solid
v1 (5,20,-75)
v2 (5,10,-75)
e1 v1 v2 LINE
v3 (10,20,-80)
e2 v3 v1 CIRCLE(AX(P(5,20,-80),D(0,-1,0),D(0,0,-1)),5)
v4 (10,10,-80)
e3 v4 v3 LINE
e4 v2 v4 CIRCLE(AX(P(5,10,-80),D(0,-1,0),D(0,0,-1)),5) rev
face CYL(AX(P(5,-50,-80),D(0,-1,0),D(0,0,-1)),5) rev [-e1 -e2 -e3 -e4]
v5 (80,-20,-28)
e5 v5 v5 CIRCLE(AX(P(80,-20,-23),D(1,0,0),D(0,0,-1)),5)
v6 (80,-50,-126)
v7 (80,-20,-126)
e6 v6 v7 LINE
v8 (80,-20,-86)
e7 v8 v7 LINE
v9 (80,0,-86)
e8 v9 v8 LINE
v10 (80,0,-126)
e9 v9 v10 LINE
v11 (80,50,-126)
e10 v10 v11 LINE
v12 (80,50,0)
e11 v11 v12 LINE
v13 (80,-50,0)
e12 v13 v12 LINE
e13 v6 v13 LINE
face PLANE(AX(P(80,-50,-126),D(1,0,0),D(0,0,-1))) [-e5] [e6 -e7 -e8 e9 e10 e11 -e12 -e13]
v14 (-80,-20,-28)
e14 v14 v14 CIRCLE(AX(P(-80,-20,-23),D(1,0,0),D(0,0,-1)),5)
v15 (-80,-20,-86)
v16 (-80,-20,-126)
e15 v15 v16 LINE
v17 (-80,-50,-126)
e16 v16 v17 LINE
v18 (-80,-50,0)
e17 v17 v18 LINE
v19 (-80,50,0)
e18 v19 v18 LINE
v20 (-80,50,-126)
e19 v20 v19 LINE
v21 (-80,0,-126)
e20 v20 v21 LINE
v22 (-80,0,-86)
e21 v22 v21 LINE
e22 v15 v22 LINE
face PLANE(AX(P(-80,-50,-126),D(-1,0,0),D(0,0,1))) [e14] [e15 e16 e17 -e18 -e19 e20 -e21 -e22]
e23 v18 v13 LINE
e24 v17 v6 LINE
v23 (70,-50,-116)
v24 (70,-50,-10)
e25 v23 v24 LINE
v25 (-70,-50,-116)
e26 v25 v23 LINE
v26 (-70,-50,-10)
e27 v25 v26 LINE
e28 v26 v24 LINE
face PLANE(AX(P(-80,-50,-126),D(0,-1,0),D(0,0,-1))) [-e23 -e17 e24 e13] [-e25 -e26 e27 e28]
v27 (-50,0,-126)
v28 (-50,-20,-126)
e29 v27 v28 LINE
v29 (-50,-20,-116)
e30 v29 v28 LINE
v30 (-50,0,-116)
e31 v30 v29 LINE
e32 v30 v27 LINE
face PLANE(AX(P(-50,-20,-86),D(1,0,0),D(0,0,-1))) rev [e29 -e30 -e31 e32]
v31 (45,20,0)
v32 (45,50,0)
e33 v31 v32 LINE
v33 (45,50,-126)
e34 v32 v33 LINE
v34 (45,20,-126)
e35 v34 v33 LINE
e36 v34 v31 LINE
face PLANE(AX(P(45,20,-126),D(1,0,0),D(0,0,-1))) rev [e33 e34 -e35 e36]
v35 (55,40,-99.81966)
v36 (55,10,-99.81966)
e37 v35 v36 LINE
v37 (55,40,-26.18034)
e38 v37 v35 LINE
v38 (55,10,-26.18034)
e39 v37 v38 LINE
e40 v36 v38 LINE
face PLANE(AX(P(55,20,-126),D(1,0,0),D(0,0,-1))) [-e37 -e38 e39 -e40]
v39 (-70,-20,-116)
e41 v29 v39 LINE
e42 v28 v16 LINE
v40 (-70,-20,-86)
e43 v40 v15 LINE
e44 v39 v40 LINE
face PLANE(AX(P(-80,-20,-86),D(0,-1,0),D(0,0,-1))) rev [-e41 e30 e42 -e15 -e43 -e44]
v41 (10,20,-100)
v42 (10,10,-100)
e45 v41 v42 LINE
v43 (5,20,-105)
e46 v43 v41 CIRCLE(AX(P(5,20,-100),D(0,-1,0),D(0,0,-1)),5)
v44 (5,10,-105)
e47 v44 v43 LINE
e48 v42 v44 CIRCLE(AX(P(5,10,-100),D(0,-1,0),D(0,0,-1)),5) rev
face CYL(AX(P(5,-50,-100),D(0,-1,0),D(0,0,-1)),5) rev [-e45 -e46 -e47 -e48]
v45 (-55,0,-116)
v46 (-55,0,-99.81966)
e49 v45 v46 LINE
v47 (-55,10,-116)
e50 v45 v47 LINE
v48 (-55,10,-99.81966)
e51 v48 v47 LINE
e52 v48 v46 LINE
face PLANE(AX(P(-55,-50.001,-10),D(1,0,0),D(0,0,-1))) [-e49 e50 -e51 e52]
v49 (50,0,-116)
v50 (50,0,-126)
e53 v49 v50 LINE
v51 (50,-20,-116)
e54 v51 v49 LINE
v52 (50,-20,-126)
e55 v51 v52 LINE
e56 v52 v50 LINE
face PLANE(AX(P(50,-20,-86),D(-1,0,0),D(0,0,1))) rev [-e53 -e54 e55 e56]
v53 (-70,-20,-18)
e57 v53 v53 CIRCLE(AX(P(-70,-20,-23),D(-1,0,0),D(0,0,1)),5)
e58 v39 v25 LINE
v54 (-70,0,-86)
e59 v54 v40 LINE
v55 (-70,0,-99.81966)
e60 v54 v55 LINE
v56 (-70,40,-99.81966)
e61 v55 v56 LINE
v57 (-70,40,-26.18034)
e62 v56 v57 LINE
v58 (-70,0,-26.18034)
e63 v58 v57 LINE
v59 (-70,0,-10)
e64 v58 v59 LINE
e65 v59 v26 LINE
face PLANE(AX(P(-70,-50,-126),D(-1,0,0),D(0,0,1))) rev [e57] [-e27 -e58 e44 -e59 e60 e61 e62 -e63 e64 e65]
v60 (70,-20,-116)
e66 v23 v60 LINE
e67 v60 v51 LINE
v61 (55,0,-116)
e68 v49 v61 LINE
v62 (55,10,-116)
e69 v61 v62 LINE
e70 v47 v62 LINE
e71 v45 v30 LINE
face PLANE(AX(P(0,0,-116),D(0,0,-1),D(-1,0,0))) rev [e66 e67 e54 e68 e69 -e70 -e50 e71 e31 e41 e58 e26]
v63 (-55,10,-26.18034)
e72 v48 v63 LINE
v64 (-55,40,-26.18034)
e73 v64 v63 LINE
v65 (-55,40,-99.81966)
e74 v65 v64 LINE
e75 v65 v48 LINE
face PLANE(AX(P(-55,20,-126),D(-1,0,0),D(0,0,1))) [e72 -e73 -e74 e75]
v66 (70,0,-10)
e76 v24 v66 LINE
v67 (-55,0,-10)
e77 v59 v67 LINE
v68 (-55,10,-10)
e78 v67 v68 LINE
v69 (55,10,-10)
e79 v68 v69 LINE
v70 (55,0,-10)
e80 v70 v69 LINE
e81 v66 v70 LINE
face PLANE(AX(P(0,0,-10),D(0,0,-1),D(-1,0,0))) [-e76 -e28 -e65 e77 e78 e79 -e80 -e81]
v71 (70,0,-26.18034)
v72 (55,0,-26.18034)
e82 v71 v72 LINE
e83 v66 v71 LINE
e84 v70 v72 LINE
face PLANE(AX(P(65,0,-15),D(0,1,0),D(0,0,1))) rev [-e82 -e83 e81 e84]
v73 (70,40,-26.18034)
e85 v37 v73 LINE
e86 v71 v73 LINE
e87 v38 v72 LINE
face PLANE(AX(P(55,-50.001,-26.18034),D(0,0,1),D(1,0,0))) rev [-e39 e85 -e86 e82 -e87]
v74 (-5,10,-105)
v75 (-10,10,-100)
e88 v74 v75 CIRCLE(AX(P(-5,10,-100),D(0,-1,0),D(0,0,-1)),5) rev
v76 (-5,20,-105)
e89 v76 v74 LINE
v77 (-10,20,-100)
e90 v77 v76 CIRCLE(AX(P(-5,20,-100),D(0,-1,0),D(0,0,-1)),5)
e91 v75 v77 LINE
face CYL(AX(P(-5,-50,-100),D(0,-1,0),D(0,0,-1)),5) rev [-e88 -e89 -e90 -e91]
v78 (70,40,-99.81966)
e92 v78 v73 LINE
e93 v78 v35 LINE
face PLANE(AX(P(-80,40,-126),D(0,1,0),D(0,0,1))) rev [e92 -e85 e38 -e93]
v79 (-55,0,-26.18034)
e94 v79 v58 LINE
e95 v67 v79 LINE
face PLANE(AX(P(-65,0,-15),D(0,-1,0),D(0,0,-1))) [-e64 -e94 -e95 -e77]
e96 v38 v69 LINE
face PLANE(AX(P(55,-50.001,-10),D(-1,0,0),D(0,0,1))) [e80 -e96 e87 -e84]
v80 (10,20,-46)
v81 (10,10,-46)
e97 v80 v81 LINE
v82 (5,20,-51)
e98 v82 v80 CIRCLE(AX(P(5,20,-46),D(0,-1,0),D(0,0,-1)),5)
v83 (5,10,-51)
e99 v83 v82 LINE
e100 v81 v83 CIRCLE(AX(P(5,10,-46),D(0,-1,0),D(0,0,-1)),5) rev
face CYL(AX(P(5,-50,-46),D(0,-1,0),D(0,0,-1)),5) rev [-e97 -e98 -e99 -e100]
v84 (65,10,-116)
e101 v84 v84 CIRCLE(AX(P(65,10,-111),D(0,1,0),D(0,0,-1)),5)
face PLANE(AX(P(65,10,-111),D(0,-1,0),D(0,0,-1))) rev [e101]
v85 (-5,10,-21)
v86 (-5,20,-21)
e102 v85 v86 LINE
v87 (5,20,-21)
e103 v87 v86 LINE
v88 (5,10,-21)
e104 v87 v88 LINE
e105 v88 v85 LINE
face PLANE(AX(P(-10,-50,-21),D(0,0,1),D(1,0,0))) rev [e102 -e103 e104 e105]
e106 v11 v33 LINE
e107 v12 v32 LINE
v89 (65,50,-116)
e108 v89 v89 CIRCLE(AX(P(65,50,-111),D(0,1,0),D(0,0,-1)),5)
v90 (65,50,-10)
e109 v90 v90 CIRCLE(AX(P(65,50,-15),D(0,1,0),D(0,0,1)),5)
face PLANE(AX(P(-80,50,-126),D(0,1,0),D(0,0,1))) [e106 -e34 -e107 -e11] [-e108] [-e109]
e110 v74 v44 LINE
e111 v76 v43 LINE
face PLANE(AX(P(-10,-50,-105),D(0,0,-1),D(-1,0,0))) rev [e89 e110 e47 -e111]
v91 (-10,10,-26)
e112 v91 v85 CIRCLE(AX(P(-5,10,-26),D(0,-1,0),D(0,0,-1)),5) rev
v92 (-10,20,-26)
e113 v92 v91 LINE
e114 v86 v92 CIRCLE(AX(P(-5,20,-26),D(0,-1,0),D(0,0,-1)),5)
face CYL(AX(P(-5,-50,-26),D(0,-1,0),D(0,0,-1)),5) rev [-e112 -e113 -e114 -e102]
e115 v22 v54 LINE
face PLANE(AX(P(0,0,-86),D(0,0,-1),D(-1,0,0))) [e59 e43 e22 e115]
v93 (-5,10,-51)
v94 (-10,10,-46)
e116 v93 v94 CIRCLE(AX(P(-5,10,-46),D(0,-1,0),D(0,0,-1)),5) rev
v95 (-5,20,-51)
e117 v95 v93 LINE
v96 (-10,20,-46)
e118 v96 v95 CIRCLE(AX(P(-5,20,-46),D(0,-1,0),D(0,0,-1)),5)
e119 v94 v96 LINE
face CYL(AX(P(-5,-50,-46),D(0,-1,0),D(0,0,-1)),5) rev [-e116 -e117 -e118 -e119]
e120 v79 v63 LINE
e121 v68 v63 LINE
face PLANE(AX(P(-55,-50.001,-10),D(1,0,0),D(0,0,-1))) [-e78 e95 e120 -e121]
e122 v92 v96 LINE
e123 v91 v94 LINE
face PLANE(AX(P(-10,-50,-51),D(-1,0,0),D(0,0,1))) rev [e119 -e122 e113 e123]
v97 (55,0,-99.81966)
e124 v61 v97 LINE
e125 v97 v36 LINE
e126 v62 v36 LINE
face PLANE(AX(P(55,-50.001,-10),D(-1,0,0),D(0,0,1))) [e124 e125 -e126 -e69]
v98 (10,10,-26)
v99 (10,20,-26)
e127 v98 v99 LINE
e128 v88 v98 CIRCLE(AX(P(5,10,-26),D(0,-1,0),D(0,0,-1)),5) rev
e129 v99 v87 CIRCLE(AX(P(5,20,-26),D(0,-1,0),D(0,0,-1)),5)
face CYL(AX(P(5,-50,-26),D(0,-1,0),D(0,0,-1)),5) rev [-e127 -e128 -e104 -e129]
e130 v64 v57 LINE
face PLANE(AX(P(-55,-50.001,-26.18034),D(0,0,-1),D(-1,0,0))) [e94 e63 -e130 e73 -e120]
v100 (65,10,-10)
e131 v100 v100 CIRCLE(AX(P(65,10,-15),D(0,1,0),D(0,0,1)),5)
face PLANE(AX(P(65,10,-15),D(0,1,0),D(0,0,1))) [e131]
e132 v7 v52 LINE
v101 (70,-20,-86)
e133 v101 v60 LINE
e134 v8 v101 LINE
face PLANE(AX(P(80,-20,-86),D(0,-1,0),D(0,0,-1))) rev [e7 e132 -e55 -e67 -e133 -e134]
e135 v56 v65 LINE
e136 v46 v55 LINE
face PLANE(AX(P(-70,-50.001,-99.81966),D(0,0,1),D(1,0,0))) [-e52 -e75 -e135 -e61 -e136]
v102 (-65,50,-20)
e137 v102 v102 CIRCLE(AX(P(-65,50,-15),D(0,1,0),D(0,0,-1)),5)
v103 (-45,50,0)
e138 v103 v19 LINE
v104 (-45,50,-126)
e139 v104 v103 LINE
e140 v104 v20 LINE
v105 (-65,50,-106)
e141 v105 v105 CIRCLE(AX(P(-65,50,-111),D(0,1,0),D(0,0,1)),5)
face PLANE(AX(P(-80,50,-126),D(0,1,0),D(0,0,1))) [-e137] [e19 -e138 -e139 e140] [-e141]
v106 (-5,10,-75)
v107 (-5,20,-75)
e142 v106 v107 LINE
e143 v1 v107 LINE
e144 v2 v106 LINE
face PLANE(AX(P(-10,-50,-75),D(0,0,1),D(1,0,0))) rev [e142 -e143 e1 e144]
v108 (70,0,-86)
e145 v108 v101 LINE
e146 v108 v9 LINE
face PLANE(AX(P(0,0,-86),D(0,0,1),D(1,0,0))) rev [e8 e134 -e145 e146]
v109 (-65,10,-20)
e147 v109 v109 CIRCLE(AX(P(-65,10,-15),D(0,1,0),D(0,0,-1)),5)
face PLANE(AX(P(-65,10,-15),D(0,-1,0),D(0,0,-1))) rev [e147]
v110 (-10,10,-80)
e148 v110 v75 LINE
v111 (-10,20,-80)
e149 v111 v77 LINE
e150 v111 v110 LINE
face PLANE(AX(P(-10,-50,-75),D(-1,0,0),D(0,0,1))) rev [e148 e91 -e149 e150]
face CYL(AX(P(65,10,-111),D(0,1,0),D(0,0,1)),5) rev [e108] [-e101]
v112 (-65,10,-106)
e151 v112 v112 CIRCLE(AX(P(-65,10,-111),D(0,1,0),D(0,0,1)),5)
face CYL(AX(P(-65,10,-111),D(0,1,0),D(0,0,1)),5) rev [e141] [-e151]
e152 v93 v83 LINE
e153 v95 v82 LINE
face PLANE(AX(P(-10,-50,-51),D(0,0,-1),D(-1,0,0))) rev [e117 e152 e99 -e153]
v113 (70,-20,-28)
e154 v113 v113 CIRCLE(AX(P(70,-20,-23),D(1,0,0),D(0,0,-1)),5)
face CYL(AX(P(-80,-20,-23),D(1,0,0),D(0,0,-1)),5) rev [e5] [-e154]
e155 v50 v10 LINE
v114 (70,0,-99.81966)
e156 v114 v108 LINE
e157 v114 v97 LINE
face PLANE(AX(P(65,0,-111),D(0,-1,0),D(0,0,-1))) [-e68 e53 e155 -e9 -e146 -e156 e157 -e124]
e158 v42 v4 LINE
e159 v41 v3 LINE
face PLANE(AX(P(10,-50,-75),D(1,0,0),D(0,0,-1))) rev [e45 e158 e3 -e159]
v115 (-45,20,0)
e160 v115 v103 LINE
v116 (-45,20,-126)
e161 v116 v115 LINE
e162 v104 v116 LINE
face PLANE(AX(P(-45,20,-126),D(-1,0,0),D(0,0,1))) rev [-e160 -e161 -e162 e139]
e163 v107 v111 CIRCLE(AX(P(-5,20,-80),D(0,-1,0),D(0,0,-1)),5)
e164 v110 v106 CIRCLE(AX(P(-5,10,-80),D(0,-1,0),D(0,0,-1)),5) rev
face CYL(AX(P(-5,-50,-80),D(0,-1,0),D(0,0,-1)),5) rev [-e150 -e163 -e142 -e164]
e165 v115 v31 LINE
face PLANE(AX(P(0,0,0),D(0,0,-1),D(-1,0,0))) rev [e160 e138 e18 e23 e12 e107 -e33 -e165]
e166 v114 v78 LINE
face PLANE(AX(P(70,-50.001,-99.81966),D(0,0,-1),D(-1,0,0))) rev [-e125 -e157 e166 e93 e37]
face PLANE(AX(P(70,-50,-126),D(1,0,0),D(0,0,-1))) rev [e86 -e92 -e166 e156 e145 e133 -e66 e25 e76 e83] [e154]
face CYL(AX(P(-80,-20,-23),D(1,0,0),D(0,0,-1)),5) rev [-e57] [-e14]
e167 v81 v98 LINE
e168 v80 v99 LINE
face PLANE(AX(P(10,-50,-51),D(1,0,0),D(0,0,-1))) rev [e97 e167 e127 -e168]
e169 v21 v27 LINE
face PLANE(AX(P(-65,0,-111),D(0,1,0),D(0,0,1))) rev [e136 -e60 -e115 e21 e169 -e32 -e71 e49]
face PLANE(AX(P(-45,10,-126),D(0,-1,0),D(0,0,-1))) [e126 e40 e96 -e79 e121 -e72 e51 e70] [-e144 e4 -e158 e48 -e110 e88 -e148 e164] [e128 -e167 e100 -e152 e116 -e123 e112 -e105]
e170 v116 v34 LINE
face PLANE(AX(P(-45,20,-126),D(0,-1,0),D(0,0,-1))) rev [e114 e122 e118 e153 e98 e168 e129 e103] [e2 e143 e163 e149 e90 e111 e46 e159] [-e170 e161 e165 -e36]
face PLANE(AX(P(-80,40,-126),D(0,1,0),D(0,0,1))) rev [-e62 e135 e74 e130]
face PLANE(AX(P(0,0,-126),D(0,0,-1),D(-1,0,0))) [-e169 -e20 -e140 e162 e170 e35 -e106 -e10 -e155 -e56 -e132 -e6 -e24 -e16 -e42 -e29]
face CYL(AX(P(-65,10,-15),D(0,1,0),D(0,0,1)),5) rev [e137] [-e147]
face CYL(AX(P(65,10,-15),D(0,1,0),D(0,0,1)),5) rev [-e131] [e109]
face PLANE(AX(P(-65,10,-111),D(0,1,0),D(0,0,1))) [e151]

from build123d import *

# Parameters (mm, degrees)
SKETCH1_W           = 160
SKETCH1_H           = 100
BOSS_EXTRUDE1_DEPTH = 126
SKETCH2_W           = 90
SKETCH2_H           = 60
CUT_EXTRUDE1_DEPTH  = 126
SKETCH3_R           = 5
CUT_EXTRUDE2_DEPTH  = 40
SHELL1_START        = -50
SHELL1_DEPTH        = 60
SHELL1_2_DEPTH      = 50
SHELL1_START_2      = 10
SHELL1_3_DEPTH      = 30
SKETCH4_W           = 20
SKETCH4_H           = 30
CUT_EXTRUDE3_DEPTH  = 180.655225362
FILLET1_R           = 5
SKETCH5_W           = 30
SKETCH5_H           = 20
CUT_EXTRUDE4_DEPTH  = 40
SKETCH6_W           = 110
SKETCH6_H           = 106
CUT_EXTRUDE5_DEPTH  = 10
SKETCH7_W           = 15
SKETCH7_H           = 73.639320226
CUT_EXTRUDE6_DEPTH  = 40
SKETCH8_R           = 5
CUT_EXTRUDE7_DEPTH  = 210.704554075


# Read off the part's stored shape, not the designer's step: Shell1
with BuildPart() as part:
    # Sketch1 → Boss-Extrude1 (new body)
    with BuildSketch(Plane.XY):
        Rectangle(SKETCH1_W, SKETCH1_H)
    extrude(amount=-BOSS_EXTRUDE1_DEPTH)

    # Sketch2 → Cut-Extrude1 (cut)
    with BuildSketch(Plane.XY):
        with Locations((0, 50)):
            Rectangle(SKETCH2_W, SKETCH2_H)
    extrude(amount=-CUT_EXTRUDE1_DEPTH, mode=Mode.SUBTRACT)

    # Sketch3 → Cut-Extrude2 (cut)
    with BuildSketch(Plane(origin=(0, 50, 0), x_dir=(1, 0, 0), z_dir=(0, 1, 0))):
        with Locations(Location((-65, 111, 0), (0, 0, 270))):
            Circle(SKETCH3_R)
        with Locations(Location((65, 111, 0), (0, 0, 90))):
            Circle(SKETCH3_R)
        with Locations(Location((65, 15, 0), (0, 0, 270))):
            Circle(SKETCH3_R)
        with Locations(Location((-65, 15, 0), (0, 0, 90))):
            Circle(SKETCH3_R)
    extrude(amount=-CUT_EXTRUDE2_DEPTH, mode=Mode.SUBTRACT)

    # Shell1 outline → Shell1 (cut)
    with BuildSketch(Plane(origin=(0, 0, 0), x_dir=(1, 0, 0), z_dir=(0, 1, 0)).offset(SHELL1_START)):
        with BuildLine():
            Line((70, 29.142135624), (70, 96.857864376))
            ThreePointArc((70, 96.857864376), (54.393398282, 100.393398282), (50.857864376, 116))
            Line((50.857864376, 116), (-50.857864376, 116))
            ThreePointArc((-50.857864376, 116), (-54.393398282, 100.393398282), (-70, 96.857864376))
            Line((-70, 96.857864376), (-70, 29.142135624))
            ThreePointArc((-70, 29.142135624), (-54.393398282, 25.606601718), (-50.857864376, 10))
            Line((-50.857864376, 10), (50.857864376, 10))
            ThreePointArc((50.857864376, 10), (54.393398282, 25.606601718), (70, 29.142135624))
        make_face()
    extrude(amount=SHELL1_DEPTH, mode=Mode.SUBTRACT)

    # Shell1 2 outline → Shell1 2 (cut)
    with BuildSketch(Plane(origin=(0, 0, 0), x_dir=(1, 0, 0), z_dir=(0, 1, 0)).offset(SHELL1_START)):
        with BuildLine():
            Line((50.857864376, 10), (70, 10))
            Line((70, 10), (70, 29.142135624))
            ThreePointArc((70, 29.142135624), (54.393398282, 25.606601718), (50.857864376, 10))
        make_face()
        with BuildLine():
            ThreePointArc((50.857864376, 116), (54.393398282, 100.393398282), (70, 96.857864376))
            Line((70, 96.857864376), (70, 116))
            Line((70, 116), (50.857864376, 116))
        make_face()
        with BuildLine():
            Line((-70, 10), (-50.857864376, 10))
            ThreePointArc((-50.857864376, 10), (-54.393398282, 25.606601718), (-70, 29.142135624))
            Line((-70, 29.142135624), (-70, 10))
        make_face()
        with BuildLine():
            ThreePointArc((-70, 96.857864376), (-54.393398282, 100.393398282), (-50.857864376, 116))
            Line((-50.857864376, 116), (-70, 116))
            Line((-70, 116), (-70, 96.857864376))
        make_face()
    extrude(amount=SHELL1_2_DEPTH, mode=Mode.SUBTRACT)

    # Shell1 3 outline → Shell1 3 (cut)
    with BuildSketch(Plane(origin=(0, 0, 0), x_dir=(1, 0, 0), z_dir=(0, 1, 0)).offset(SHELL1_START_2)):
        with BuildLine():
            ThreePointArc((55, 26.180339887), (62.094305849, 29.715873794), (70, 29.142135624))
            Line((70, 29.142135624), (70, 96.857864376))
            ThreePointArc((70, 96.857864376), (62.094305849, 96.284126206), (55, 99.819660113))
            Line((55, 99.819660113), (55, 26.180339887))
        make_face()
        with BuildLine():
            ThreePointArc((-70, 29.142135624), (-62.094305849, 29.715873794), (-55, 26.180339887))
            Line((-55, 26.180339887), (-55, 99.819660113))
            ThreePointArc((-55, 99.819660113), (-62.094305849, 96.284126206), (-70, 96.857864376))
            Line((-70, 96.857864376), (-70, 29.142135624))
        make_face()
    extrude(amount=SHELL1_3_DEPTH, mode=Mode.SUBTRACT)

    # Sketch4 → Cut-Extrude3 (cut, through all)
    with BuildSketch(Plane(origin=(0, 50, 0), x_dir=(1, 0, 0), z_dir=(0, 1, 0))):
        with Locations((0, 90)):
            Rectangle(SKETCH4_W, SKETCH4_H)
        with Locations((0, 36)):
            Rectangle(SKETCH4_W, SKETCH4_H)
    extrude(amount=-CUT_EXTRUDE3_DEPTH, mode=Mode.SUBTRACT)

    # Fillet1
    fillet1_edges = [part.edges().sort_by_distance(p)[0] for p in [
        (-10, 15, -21),
        (-10, 15, -51),
        (10, 15, -51),
        (10, 15, -21),
        (10, 15, -105),
        (10, 15, -75),
        (-10, 15, -75),
        (-10, 15, -105),
    ]]
    fillet(fillet1_edges, radius=FILLET1_R)

    # Sketch5 → Cut-Extrude4 (cut)
    with BuildSketch(Plane(origin=(0, 0, -126), x_dir=(-1, 0, 0), z_dir=(0, 0, -1))):
        with Locations((-65, -10)):
            Rectangle(SKETCH5_W, SKETCH5_H)
        with Locations((65, -10)):
            Rectangle(SKETCH5_W, SKETCH5_H)
    extrude(amount=-CUT_EXTRUDE4_DEPTH, mode=Mode.SUBTRACT)

    # Sketch6 → Cut-Extrude5 (cut)
    with BuildSketch(Plane.XZ.offset(-10)):
        with Locations((0, -63)):
            Rectangle(SKETCH6_W, SKETCH6_H)
    extrude(amount=CUT_EXTRUDE5_DEPTH, mode=Mode.SUBTRACT)

    # Sketch7 → Cut-Extrude6 (cut)
    with BuildSketch(Plane.XZ.offset(-40)):
        with Locations((-62.5, -63)):
            Rectangle(SKETCH7_W, SKETCH7_H)
    cut_extrude6 = extrude(amount=CUT_EXTRUDE6_DEPTH, mode=Mode.SUBTRACT)

    # Mirror1: Cut-Extrude6 across plane
    add(cut_extrude6.mirror(Plane(origin=(0, 0, 0), x_dir=(0, 0, 1), z_dir=(1, 0, 0))), mode=Mode.SUBTRACT)

    # Sketch8 → Cut-Extrude7 (cut, through all)
    with BuildSketch(Plane(origin=(80, 0, 0), x_dir=(0, 0, -1), z_dir=(1, 0, 0))):
        with Locations((23, -20)):
            Circle(SKETCH8_R)
    extrude(amount=-CUT_EXTRUDE7_DEPTH, mode=Mode.SUBTRACT)


solid = part.part
